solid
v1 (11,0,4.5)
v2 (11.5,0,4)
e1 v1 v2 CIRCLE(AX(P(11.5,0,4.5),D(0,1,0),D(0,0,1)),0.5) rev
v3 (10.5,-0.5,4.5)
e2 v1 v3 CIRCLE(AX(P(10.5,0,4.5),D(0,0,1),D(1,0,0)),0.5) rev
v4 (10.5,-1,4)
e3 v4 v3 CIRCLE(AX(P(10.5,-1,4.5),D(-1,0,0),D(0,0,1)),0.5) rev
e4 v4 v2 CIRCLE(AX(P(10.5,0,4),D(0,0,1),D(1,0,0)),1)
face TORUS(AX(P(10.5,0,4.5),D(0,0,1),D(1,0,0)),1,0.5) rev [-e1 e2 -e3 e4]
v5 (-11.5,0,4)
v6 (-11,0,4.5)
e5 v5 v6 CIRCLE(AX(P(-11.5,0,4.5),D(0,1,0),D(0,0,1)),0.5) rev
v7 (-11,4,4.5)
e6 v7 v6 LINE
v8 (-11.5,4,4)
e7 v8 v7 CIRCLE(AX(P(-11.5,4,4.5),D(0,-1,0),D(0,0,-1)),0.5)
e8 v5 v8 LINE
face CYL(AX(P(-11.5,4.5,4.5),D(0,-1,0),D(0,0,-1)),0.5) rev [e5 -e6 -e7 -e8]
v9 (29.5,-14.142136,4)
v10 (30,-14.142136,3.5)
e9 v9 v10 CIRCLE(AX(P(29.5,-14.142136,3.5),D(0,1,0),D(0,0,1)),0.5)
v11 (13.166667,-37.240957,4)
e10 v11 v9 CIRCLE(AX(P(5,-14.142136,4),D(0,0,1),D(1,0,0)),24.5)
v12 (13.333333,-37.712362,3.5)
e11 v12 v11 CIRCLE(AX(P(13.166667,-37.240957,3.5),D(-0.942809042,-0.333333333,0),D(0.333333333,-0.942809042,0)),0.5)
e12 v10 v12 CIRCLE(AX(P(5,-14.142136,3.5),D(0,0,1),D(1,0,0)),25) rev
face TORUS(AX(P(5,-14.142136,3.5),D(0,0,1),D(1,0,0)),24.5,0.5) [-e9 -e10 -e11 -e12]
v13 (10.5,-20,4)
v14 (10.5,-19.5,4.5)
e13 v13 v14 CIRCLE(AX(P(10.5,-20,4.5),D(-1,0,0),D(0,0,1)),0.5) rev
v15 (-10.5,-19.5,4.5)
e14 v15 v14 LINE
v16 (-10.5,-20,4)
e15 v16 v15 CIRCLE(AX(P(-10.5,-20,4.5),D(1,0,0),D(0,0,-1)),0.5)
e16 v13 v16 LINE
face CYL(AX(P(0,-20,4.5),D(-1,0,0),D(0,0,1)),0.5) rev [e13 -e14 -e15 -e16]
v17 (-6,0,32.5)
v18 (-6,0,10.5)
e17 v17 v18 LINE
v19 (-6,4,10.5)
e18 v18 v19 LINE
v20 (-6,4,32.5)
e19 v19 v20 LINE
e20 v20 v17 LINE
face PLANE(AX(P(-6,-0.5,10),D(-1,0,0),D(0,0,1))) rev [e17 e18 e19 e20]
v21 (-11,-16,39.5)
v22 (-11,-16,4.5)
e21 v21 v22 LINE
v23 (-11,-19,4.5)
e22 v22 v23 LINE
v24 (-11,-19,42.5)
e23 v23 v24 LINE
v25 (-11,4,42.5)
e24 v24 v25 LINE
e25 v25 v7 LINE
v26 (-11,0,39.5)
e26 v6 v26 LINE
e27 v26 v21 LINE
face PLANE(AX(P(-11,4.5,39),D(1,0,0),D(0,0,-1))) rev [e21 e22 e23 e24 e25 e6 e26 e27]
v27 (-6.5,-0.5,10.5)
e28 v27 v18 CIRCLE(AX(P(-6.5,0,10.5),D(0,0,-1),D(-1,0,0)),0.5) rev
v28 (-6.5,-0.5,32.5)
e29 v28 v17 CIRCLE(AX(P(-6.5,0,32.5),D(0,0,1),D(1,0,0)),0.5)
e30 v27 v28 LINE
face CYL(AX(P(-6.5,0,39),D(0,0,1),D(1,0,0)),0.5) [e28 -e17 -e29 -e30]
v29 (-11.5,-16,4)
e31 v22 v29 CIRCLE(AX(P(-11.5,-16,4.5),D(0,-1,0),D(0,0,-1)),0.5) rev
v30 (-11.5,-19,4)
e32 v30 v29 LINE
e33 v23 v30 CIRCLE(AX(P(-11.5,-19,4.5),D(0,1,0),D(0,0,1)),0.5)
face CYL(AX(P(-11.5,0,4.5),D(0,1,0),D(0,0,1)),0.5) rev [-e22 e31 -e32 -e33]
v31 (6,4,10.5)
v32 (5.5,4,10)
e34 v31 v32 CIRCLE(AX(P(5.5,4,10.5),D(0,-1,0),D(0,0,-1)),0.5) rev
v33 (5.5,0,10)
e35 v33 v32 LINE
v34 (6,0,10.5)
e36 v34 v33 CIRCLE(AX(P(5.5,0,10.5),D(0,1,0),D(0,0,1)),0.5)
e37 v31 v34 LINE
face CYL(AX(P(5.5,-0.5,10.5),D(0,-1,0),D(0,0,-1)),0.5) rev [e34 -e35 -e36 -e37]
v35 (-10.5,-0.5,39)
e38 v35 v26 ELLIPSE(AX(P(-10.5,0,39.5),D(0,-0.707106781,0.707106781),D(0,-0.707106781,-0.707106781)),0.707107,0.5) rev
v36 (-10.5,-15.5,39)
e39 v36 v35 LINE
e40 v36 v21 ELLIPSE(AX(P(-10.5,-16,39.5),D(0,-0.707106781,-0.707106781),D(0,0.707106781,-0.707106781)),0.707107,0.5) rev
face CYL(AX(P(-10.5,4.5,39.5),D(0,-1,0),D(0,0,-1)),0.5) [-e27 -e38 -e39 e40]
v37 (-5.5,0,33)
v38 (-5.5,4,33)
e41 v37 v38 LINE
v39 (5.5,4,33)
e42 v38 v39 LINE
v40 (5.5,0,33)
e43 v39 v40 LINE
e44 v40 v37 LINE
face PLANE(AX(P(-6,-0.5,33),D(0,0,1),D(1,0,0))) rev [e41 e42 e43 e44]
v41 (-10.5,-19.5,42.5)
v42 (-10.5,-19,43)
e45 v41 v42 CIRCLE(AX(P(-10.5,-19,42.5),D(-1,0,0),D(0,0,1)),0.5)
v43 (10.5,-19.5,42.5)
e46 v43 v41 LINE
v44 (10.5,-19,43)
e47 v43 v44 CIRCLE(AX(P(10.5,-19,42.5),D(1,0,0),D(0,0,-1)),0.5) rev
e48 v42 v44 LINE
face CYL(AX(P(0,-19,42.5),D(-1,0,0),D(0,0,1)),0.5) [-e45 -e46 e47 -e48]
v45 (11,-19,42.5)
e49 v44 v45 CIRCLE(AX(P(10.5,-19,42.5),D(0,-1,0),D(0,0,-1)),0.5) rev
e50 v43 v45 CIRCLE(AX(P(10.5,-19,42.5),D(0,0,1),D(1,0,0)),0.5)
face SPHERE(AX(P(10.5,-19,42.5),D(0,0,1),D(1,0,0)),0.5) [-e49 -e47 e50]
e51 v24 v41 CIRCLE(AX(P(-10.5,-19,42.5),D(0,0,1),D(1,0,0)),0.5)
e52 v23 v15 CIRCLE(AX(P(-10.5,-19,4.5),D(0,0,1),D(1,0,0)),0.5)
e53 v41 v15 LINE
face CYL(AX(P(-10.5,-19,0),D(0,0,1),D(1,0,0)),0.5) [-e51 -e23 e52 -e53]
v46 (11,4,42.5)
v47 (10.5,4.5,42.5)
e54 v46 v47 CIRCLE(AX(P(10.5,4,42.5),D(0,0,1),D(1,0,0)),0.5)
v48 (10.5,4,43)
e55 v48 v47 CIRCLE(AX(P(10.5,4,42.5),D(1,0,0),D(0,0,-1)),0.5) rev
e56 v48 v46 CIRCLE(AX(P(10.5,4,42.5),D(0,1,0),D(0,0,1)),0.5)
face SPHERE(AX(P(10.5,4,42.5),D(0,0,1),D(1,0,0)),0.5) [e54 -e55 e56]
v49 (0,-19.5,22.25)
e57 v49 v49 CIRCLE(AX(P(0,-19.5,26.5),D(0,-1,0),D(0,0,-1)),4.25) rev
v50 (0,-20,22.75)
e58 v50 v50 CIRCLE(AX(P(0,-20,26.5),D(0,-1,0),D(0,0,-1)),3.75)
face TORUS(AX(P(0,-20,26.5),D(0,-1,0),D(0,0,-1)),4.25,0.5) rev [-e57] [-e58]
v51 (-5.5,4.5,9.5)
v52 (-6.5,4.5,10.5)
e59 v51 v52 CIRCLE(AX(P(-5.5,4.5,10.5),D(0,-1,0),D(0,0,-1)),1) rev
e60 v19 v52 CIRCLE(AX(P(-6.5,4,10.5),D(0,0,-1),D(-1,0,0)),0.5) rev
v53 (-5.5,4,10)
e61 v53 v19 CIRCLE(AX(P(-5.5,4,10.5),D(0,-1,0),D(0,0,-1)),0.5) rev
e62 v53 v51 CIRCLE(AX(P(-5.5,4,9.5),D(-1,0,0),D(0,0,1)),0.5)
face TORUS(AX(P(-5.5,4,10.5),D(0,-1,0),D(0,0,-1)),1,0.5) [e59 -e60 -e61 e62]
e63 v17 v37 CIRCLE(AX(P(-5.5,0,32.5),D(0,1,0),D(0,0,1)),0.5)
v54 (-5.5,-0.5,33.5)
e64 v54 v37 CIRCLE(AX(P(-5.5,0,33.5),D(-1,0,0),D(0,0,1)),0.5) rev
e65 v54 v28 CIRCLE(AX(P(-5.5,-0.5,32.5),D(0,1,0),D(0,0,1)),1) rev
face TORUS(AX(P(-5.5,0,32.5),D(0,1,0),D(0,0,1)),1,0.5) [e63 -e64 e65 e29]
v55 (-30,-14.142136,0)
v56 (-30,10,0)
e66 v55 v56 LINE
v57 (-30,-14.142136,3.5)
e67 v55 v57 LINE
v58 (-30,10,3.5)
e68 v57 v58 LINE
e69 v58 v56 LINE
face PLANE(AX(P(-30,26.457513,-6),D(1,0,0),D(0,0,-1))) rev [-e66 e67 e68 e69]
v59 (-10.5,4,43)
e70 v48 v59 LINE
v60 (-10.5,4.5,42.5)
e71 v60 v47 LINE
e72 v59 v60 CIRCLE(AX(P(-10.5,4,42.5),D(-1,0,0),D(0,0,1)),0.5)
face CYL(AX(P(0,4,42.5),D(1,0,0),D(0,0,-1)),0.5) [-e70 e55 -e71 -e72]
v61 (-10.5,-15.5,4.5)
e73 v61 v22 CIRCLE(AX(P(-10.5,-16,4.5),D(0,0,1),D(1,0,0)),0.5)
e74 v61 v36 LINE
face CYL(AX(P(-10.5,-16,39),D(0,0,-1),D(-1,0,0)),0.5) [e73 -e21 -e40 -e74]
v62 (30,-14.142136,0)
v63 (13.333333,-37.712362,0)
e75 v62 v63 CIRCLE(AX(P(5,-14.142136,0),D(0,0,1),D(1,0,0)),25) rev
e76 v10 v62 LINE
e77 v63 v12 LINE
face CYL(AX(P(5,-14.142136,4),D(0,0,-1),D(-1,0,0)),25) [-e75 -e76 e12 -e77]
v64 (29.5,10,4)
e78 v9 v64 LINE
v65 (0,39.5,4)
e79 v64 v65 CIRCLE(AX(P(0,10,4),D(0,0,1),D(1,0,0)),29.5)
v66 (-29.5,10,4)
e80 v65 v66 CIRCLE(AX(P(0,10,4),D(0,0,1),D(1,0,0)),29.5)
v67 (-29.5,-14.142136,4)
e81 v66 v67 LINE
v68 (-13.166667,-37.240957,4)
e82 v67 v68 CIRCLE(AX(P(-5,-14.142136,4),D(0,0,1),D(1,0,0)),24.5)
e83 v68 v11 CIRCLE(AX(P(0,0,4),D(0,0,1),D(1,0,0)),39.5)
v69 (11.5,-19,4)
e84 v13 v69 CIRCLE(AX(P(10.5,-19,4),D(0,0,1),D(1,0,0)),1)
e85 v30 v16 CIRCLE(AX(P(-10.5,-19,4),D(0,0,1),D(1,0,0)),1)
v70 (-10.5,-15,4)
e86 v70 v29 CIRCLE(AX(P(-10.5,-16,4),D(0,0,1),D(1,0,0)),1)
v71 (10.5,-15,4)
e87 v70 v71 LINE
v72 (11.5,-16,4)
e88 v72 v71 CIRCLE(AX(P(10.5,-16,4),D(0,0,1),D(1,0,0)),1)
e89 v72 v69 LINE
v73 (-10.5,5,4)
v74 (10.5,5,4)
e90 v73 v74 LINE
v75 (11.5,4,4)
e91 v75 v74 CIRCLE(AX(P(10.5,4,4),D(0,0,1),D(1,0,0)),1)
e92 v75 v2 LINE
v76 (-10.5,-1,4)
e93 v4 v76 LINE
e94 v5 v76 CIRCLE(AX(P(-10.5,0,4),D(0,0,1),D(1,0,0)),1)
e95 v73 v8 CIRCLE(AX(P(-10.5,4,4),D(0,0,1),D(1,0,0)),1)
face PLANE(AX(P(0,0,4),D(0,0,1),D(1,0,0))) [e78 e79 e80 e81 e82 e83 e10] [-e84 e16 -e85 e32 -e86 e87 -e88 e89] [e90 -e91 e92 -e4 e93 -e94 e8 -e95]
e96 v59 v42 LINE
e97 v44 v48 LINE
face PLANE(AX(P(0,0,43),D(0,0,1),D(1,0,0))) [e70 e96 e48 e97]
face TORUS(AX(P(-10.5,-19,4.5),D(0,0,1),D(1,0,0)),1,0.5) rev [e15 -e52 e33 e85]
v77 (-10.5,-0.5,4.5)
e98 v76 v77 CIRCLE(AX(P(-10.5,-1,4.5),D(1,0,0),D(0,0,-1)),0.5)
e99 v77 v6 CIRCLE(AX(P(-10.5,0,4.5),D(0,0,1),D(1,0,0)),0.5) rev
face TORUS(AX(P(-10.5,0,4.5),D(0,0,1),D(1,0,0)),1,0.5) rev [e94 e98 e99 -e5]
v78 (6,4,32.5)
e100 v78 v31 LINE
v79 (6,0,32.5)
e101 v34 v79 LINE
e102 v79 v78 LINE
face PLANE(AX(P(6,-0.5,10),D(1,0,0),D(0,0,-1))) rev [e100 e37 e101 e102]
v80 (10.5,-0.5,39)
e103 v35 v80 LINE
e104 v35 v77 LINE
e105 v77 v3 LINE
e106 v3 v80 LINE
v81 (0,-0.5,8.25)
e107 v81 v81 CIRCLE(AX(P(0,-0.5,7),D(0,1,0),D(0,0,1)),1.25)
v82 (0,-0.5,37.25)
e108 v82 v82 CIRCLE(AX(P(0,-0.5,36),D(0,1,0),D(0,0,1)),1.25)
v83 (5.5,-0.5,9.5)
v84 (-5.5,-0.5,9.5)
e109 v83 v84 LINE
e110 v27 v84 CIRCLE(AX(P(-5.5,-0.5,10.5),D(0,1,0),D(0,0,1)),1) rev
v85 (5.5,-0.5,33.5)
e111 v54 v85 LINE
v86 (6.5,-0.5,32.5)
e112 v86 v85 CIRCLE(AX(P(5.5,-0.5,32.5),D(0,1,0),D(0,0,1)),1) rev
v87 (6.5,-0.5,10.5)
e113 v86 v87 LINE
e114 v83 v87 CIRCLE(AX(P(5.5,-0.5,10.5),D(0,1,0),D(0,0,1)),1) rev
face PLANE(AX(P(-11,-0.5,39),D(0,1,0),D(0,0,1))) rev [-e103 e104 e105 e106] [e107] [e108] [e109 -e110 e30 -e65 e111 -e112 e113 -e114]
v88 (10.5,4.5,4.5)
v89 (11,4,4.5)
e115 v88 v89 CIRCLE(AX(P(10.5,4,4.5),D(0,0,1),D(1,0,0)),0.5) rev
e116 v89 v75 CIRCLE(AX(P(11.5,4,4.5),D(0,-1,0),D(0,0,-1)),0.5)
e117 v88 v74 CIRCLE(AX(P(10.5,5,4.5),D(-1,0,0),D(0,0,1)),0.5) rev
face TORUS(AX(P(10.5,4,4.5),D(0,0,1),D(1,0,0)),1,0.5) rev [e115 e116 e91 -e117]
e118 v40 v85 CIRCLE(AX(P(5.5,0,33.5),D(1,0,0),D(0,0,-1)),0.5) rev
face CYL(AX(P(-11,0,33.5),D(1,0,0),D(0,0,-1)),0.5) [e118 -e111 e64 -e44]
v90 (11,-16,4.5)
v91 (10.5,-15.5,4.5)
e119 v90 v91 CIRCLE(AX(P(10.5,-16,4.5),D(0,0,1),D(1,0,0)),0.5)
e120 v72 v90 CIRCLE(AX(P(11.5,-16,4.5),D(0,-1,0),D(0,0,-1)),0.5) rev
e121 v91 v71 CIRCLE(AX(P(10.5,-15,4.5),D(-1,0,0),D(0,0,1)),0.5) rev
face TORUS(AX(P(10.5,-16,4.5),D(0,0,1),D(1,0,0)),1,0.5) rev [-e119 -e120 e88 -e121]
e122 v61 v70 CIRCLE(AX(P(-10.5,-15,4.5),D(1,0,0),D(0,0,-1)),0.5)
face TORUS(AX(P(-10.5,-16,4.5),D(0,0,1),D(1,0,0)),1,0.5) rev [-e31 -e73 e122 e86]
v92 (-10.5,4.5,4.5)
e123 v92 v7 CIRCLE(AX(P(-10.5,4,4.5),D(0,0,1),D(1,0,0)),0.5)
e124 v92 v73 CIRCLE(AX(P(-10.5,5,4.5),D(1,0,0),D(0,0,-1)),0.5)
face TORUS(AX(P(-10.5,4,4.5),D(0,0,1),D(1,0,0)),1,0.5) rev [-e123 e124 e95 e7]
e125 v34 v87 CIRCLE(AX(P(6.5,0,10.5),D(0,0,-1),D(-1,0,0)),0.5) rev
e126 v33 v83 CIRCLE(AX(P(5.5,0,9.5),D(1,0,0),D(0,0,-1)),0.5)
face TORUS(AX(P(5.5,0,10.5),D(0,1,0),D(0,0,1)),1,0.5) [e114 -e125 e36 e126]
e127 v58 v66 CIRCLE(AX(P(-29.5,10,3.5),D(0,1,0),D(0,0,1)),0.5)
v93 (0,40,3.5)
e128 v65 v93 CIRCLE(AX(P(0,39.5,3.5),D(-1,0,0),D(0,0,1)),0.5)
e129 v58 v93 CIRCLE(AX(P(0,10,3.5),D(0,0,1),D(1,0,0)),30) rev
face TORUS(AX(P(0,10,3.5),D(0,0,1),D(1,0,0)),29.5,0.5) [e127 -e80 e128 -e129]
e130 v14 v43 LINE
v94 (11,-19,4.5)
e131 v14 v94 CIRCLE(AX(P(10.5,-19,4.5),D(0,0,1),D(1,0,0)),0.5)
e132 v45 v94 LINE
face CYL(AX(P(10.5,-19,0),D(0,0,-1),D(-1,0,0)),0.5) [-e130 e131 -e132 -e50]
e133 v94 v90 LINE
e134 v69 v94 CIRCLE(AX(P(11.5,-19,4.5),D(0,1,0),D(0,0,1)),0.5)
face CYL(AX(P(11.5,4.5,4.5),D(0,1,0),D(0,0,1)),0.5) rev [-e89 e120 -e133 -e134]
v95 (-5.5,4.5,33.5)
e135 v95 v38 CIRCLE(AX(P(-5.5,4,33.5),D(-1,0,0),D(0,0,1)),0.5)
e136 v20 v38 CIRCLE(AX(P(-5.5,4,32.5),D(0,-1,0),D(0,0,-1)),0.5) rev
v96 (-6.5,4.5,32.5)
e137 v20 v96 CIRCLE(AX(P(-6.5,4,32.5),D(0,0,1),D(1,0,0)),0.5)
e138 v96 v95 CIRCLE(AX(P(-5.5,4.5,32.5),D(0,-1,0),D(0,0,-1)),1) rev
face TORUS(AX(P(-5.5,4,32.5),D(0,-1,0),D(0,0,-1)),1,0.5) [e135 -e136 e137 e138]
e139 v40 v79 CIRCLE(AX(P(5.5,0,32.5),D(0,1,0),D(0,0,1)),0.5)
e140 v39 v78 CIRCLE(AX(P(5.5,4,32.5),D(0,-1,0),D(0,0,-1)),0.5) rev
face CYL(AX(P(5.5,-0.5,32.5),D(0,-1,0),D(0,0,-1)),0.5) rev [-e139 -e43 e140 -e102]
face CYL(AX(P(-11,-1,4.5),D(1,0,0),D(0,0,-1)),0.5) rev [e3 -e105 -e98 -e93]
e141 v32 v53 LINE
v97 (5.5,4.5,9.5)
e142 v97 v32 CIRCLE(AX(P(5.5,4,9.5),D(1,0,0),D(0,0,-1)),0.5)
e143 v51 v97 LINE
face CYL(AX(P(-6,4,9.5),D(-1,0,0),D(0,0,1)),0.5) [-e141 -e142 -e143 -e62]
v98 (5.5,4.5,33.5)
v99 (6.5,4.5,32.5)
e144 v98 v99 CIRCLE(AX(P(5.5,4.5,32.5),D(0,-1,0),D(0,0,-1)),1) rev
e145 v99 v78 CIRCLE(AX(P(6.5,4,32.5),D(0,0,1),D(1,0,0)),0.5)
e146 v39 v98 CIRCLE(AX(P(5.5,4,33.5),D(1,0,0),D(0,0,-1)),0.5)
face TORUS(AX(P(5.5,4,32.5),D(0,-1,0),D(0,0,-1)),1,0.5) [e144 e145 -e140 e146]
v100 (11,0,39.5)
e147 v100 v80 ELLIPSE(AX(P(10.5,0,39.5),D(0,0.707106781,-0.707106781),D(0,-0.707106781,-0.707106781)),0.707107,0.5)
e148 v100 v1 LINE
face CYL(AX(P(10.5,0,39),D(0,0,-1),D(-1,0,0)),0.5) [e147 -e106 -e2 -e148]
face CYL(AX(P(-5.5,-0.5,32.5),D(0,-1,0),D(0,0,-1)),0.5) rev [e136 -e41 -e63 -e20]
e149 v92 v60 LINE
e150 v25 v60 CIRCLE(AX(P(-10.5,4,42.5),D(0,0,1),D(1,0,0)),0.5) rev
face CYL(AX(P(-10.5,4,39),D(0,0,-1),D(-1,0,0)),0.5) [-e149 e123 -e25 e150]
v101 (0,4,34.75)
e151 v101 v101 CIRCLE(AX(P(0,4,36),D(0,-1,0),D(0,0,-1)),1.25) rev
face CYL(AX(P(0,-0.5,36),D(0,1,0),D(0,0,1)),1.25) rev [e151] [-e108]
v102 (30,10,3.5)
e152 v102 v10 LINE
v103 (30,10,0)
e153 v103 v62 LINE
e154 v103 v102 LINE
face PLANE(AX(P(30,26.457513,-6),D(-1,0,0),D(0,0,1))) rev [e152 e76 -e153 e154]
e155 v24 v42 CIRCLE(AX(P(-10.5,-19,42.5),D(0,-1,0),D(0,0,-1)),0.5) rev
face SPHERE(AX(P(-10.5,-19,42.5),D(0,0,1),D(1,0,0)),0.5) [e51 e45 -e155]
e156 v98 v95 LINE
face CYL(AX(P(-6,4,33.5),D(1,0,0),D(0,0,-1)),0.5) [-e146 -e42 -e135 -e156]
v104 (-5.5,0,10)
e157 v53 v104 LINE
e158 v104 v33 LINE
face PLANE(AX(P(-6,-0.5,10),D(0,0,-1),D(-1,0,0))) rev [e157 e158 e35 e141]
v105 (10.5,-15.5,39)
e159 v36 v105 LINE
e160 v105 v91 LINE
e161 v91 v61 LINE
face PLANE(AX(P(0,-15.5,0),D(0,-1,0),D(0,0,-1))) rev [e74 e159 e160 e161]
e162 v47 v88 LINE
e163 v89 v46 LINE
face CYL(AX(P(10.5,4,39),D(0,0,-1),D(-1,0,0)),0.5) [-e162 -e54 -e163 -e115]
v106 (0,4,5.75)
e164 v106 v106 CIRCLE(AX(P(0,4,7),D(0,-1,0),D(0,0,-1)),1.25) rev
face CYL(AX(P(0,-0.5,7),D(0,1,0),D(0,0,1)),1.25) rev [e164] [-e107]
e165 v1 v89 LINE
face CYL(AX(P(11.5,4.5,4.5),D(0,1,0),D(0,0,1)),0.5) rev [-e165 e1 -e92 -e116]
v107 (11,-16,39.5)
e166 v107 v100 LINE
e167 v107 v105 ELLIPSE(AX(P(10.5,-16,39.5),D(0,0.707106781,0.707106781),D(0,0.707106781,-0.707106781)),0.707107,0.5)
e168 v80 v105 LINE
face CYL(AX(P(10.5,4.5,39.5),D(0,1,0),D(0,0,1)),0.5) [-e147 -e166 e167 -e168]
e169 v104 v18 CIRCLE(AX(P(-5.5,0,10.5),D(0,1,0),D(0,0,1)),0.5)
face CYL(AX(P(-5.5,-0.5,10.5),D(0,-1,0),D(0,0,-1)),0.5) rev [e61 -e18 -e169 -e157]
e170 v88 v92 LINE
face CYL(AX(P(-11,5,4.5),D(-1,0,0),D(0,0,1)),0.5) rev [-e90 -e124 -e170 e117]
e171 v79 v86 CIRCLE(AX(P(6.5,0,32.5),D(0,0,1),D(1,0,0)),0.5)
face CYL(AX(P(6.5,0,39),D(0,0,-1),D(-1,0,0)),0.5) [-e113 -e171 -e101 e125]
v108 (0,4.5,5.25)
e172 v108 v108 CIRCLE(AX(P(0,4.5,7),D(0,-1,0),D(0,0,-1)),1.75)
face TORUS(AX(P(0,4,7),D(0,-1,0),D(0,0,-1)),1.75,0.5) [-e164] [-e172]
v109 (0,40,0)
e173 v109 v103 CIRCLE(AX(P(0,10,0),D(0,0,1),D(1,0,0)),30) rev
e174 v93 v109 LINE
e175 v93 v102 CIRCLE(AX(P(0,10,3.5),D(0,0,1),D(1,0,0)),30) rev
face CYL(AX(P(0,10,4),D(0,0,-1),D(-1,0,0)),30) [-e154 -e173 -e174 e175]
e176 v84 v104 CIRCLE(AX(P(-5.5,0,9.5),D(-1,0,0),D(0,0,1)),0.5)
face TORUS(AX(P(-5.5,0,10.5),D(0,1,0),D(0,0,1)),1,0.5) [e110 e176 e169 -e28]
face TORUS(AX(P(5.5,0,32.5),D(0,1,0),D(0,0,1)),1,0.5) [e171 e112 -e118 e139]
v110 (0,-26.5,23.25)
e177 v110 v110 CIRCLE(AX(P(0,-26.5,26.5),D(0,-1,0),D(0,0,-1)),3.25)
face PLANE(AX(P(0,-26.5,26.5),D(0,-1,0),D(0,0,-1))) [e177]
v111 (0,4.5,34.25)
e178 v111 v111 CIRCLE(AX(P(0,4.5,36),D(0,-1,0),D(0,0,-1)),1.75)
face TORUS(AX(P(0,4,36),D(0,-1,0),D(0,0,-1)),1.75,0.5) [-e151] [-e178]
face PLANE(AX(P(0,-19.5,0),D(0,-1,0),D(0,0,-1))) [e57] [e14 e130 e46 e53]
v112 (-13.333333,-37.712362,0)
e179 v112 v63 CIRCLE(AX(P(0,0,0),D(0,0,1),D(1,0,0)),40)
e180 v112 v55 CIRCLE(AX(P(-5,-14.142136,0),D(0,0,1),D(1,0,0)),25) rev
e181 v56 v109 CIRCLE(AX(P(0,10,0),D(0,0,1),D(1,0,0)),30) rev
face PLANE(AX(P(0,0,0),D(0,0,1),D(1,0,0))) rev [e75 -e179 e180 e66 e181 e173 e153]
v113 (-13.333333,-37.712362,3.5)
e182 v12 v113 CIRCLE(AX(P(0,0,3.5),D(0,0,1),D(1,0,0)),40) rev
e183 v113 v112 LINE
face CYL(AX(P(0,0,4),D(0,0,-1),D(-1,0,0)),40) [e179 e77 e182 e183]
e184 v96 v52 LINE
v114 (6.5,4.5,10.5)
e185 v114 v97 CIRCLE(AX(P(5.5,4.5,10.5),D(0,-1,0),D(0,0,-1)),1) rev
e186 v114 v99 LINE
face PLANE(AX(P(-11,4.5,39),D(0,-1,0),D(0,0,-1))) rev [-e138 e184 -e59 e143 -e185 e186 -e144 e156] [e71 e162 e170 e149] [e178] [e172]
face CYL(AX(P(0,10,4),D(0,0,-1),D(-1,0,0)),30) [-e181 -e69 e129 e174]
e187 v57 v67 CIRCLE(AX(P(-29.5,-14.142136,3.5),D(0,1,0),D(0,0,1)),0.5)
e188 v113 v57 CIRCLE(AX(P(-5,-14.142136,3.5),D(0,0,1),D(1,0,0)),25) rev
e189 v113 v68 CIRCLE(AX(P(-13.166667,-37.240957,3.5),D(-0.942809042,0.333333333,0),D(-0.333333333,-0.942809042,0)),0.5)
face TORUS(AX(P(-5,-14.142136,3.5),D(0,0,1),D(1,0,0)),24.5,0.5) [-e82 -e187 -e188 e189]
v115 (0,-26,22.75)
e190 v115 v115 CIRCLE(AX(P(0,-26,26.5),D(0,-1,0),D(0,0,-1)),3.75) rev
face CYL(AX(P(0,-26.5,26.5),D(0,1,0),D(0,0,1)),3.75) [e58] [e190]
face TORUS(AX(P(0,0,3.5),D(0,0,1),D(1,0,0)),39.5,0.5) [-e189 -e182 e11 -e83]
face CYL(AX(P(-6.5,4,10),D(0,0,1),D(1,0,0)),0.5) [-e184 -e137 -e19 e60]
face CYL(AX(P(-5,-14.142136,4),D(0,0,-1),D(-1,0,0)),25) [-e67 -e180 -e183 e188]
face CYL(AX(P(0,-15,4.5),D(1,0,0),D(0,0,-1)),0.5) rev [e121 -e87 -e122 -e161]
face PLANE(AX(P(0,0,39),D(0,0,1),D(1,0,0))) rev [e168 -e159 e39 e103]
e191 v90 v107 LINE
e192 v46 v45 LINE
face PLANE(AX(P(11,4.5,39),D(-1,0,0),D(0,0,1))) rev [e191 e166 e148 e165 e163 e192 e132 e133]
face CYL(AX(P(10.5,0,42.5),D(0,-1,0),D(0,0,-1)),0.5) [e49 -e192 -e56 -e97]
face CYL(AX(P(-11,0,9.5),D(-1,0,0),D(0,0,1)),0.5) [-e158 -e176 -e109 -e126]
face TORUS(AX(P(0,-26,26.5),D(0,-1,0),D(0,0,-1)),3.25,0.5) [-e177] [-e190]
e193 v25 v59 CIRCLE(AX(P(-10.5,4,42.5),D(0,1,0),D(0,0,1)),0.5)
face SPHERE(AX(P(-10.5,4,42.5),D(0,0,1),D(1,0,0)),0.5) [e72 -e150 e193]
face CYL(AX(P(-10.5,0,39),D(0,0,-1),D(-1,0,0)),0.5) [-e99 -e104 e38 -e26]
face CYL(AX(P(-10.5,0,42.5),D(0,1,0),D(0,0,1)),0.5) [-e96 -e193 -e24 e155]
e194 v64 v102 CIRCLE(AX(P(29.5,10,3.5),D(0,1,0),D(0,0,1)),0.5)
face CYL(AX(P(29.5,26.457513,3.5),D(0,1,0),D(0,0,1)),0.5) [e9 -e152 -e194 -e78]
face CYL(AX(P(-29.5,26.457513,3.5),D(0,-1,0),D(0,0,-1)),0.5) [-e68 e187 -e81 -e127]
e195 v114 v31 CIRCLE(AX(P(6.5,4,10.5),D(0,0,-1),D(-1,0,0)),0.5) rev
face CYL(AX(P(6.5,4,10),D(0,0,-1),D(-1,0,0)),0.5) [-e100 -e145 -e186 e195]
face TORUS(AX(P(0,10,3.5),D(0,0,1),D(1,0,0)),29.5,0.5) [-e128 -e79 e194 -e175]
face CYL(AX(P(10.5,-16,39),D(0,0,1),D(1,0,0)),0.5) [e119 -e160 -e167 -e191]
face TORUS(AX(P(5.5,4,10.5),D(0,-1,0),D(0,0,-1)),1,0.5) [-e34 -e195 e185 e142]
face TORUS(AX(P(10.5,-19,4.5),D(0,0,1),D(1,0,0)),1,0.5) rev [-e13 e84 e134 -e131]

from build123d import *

# Parameters (mm, degrees)
SKETCH1_R           = 40
BOSS_EXTRUDE1_DEPTH = 4
CUT_EXTRUDE3_START  = -10
CUT_EXTRUDE3_DEPTH  = 10
FILLET1_R           = 30
FILLET2_R           = 25
SKETCH4_W           = 22
SKETCH4_H           = 5
BOSS_EXTRUDE2_DEPTH = 35
SKETCH5_W           = 12
SKETCH5_H           = 23
CUT_EXTRUDE1_DEPTH  = 5
SKETCH6_R           = 1.25
CUT_EXTRUDE2_DEPTH  = 5
SKETCH7_W           = 22
SKETCH7_H           = 20
BOSS_EXTRUDE3_DEPTH = 4
SKETCH8_W           = 22
SKETCH8_H           = 39
BOSS_EXTRUDE4_DEPTH = 4
SKETCH9_R           = 3.75
BOSS_EXTRUDE5_DEPTH = 7
FILLET3_R           = 0.5
FILLET4_R           = 0.5


with BuildPart() as part:
    # Sketch1 → Boss-Extrude1 (new body)
    with BuildSketch(Plane.XY):
        Circle(SKETCH1_R)
    extrude(amount=BOSS_EXTRUDE1_DEPTH)

    # Sketch10 → Cut-Extrude3 (cut)
    with BuildSketch(Plane.XY.offset(4).offset(CUT_EXTRUDE3_START)):
        with BuildLine():
            Line((-30, 26.457513111), (-30, -26.457513111))
            ThreePointArc((-30, -26.457513111), (-40, 0), (-30, 26.457513111))
        make_face()
        with BuildLine():
            Line((30, 26.457513111), (30, -26.457513111))
            ThreePointArc((30, -26.457513111), (40, 0), (30, 26.457513111))
        make_face()
    extrude(amount=CUT_EXTRUDE3_DEPTH, mode=Mode.SUBTRACT)

    # Fillet1
    fillet1_edges = [part.edges().sort_by_distance(p)[0] for p in [
        (-30, 26.457513111, 2),
        (30, 26.457513111, 2),
    ]]
    fillet(fillet1_edges, radius=FILLET1_R - 0.0001)  # a hair under: the kernel refuses the full size

    # Fillet2
    fillet2_edges = [part.edges().sort_by_distance(p)[0] for p in [
        (-30, -26.457513111, 2),
        (30, -26.457513111, 2),
    ]]
    fillet(fillet2_edges, radius=FILLET2_R)

    # Sketch4 → Boss-Extrude2 (add)
    with BuildSketch(Plane.XY.offset(4)):
        with Locations((0, 2)):
            Rectangle(SKETCH4_W, SKETCH4_H)
    extrude(amount=BOSS_EXTRUDE2_DEPTH)

    # Sketch5 → Cut-Extrude1 (cut)
    with BuildSketch(Plane(origin=(0, 4.5, 0), x_dir=(1, 0, 0), z_dir=(0, 1, 0))):
        with Locations((0, -21.5)):
            Rectangle(SKETCH5_W, SKETCH5_H)
    extrude(amount=-CUT_EXTRUDE1_DEPTH, mode=Mode.SUBTRACT)

    # Sketch6 → Cut-Extrude2 (cut)
    with BuildSketch(Plane(origin=(0, 4.5, 0), x_dir=(1, 0, 0), z_dir=(0, 1, 0))):
        with Locations(Location((0, -7, 0), (0, 0, 270))):
            Circle(SKETCH6_R)
        with Locations(Location((0, -36, 0), (0, 0, 270))):
            Circle(SKETCH6_R)
    extrude(amount=-CUT_EXTRUDE2_DEPTH, mode=Mode.SUBTRACT)

    # Sketch7 → Boss-Extrude3 (add)
    with BuildSketch(Plane.XY.offset(39)):
        with Locations((0, -5.5)):
            Rectangle(SKETCH7_W, SKETCH7_H)
    extrude(amount=BOSS_EXTRUDE3_DEPTH)

    # Sketch8 → Boss-Extrude4 (add)
    with BuildSketch(Plane.XZ.offset(15.5)):
        with Locations((0, 23.5)):
            Rectangle(SKETCH8_W, SKETCH8_H)
    extrude(amount=BOSS_EXTRUDE4_DEPTH)

    # Sketch9 → Boss-Extrude5 (add)
    with BuildSketch(Plane.XZ.offset(19.5)):
        with Locations(Location((0, 26.5, 0), (0, 0, 270))):
            Circle(SKETCH9_R)
    extrude(amount=BOSS_EXTRUDE5_DEPTH)

    # Fillet3
    fillet3_edges = [part.edges().sort_by_distance(p)[0] for p in [
        (-11, -15.5, 21.5),
        (0, -15.5, 4),
        (-11, -17.5, 4),
        (11, -15.5, 21.5),
        (11, -17.5, 4),
        (-11, -19.5, 23.5),
        (0, -19.5, 4),
        (11, -19.5, 23.5),
        (0, -19.5, 43),
        (0, -19.5, 30.25),
        (0, -26.5, 30.25),
        (30, -2.071017812, 4),
        (21.213338789, 31.21312666, 4),
        (-21.213338789, 31.21312666, 4),
        (-30, -2.071017812, 4),
        (0, -40, 4),
        (25.412414523, -28.575892353, 4),
        (-25.412414523, -28.575892353, 4),
        (11, 2, 4),
        (11, -0.5, 21.5),
        (0, 4.5, 4),
        (11, 4.5, 23.5),
        (-11, 2, 4),
        (-11, 4.5, 23.5),
        (0, -0.5, 4),
        (-11, -0.5, 21.5),
        (6, -0.5, 21.5),
        (6, 2, 10),
        (0, -0.5, 33),
        (6, 2, 33),
        (-6, -0.5, 21.5),
        (-6, 2, 33),
        (0, -0.5, 10),
        (-6, 2, 10),
        (6, 4.5, 21.5),
        (0, 4.5, 10),
        (-6, 4.5, 21.5),
        (0, 4.5, 33),
        (-11, -8, 39),
        (11, -8, 39),
        (-11, -7.5, 43),
        (11, -7.5, 43),
        (0, 4.5, 43),
    ]]
    fillet(fillet3_edges, radius=FILLET3_R)

    # Fillet4
    fillet4_edges = [part.edges().sort_by_distance(p)[0] for p in [
        (0, 4.5, 5.75),
        (0, 4.5, 34.75),
    ]]
    fillet(fillet4_edges, radius=FILLET4_R)


solid = part.part
